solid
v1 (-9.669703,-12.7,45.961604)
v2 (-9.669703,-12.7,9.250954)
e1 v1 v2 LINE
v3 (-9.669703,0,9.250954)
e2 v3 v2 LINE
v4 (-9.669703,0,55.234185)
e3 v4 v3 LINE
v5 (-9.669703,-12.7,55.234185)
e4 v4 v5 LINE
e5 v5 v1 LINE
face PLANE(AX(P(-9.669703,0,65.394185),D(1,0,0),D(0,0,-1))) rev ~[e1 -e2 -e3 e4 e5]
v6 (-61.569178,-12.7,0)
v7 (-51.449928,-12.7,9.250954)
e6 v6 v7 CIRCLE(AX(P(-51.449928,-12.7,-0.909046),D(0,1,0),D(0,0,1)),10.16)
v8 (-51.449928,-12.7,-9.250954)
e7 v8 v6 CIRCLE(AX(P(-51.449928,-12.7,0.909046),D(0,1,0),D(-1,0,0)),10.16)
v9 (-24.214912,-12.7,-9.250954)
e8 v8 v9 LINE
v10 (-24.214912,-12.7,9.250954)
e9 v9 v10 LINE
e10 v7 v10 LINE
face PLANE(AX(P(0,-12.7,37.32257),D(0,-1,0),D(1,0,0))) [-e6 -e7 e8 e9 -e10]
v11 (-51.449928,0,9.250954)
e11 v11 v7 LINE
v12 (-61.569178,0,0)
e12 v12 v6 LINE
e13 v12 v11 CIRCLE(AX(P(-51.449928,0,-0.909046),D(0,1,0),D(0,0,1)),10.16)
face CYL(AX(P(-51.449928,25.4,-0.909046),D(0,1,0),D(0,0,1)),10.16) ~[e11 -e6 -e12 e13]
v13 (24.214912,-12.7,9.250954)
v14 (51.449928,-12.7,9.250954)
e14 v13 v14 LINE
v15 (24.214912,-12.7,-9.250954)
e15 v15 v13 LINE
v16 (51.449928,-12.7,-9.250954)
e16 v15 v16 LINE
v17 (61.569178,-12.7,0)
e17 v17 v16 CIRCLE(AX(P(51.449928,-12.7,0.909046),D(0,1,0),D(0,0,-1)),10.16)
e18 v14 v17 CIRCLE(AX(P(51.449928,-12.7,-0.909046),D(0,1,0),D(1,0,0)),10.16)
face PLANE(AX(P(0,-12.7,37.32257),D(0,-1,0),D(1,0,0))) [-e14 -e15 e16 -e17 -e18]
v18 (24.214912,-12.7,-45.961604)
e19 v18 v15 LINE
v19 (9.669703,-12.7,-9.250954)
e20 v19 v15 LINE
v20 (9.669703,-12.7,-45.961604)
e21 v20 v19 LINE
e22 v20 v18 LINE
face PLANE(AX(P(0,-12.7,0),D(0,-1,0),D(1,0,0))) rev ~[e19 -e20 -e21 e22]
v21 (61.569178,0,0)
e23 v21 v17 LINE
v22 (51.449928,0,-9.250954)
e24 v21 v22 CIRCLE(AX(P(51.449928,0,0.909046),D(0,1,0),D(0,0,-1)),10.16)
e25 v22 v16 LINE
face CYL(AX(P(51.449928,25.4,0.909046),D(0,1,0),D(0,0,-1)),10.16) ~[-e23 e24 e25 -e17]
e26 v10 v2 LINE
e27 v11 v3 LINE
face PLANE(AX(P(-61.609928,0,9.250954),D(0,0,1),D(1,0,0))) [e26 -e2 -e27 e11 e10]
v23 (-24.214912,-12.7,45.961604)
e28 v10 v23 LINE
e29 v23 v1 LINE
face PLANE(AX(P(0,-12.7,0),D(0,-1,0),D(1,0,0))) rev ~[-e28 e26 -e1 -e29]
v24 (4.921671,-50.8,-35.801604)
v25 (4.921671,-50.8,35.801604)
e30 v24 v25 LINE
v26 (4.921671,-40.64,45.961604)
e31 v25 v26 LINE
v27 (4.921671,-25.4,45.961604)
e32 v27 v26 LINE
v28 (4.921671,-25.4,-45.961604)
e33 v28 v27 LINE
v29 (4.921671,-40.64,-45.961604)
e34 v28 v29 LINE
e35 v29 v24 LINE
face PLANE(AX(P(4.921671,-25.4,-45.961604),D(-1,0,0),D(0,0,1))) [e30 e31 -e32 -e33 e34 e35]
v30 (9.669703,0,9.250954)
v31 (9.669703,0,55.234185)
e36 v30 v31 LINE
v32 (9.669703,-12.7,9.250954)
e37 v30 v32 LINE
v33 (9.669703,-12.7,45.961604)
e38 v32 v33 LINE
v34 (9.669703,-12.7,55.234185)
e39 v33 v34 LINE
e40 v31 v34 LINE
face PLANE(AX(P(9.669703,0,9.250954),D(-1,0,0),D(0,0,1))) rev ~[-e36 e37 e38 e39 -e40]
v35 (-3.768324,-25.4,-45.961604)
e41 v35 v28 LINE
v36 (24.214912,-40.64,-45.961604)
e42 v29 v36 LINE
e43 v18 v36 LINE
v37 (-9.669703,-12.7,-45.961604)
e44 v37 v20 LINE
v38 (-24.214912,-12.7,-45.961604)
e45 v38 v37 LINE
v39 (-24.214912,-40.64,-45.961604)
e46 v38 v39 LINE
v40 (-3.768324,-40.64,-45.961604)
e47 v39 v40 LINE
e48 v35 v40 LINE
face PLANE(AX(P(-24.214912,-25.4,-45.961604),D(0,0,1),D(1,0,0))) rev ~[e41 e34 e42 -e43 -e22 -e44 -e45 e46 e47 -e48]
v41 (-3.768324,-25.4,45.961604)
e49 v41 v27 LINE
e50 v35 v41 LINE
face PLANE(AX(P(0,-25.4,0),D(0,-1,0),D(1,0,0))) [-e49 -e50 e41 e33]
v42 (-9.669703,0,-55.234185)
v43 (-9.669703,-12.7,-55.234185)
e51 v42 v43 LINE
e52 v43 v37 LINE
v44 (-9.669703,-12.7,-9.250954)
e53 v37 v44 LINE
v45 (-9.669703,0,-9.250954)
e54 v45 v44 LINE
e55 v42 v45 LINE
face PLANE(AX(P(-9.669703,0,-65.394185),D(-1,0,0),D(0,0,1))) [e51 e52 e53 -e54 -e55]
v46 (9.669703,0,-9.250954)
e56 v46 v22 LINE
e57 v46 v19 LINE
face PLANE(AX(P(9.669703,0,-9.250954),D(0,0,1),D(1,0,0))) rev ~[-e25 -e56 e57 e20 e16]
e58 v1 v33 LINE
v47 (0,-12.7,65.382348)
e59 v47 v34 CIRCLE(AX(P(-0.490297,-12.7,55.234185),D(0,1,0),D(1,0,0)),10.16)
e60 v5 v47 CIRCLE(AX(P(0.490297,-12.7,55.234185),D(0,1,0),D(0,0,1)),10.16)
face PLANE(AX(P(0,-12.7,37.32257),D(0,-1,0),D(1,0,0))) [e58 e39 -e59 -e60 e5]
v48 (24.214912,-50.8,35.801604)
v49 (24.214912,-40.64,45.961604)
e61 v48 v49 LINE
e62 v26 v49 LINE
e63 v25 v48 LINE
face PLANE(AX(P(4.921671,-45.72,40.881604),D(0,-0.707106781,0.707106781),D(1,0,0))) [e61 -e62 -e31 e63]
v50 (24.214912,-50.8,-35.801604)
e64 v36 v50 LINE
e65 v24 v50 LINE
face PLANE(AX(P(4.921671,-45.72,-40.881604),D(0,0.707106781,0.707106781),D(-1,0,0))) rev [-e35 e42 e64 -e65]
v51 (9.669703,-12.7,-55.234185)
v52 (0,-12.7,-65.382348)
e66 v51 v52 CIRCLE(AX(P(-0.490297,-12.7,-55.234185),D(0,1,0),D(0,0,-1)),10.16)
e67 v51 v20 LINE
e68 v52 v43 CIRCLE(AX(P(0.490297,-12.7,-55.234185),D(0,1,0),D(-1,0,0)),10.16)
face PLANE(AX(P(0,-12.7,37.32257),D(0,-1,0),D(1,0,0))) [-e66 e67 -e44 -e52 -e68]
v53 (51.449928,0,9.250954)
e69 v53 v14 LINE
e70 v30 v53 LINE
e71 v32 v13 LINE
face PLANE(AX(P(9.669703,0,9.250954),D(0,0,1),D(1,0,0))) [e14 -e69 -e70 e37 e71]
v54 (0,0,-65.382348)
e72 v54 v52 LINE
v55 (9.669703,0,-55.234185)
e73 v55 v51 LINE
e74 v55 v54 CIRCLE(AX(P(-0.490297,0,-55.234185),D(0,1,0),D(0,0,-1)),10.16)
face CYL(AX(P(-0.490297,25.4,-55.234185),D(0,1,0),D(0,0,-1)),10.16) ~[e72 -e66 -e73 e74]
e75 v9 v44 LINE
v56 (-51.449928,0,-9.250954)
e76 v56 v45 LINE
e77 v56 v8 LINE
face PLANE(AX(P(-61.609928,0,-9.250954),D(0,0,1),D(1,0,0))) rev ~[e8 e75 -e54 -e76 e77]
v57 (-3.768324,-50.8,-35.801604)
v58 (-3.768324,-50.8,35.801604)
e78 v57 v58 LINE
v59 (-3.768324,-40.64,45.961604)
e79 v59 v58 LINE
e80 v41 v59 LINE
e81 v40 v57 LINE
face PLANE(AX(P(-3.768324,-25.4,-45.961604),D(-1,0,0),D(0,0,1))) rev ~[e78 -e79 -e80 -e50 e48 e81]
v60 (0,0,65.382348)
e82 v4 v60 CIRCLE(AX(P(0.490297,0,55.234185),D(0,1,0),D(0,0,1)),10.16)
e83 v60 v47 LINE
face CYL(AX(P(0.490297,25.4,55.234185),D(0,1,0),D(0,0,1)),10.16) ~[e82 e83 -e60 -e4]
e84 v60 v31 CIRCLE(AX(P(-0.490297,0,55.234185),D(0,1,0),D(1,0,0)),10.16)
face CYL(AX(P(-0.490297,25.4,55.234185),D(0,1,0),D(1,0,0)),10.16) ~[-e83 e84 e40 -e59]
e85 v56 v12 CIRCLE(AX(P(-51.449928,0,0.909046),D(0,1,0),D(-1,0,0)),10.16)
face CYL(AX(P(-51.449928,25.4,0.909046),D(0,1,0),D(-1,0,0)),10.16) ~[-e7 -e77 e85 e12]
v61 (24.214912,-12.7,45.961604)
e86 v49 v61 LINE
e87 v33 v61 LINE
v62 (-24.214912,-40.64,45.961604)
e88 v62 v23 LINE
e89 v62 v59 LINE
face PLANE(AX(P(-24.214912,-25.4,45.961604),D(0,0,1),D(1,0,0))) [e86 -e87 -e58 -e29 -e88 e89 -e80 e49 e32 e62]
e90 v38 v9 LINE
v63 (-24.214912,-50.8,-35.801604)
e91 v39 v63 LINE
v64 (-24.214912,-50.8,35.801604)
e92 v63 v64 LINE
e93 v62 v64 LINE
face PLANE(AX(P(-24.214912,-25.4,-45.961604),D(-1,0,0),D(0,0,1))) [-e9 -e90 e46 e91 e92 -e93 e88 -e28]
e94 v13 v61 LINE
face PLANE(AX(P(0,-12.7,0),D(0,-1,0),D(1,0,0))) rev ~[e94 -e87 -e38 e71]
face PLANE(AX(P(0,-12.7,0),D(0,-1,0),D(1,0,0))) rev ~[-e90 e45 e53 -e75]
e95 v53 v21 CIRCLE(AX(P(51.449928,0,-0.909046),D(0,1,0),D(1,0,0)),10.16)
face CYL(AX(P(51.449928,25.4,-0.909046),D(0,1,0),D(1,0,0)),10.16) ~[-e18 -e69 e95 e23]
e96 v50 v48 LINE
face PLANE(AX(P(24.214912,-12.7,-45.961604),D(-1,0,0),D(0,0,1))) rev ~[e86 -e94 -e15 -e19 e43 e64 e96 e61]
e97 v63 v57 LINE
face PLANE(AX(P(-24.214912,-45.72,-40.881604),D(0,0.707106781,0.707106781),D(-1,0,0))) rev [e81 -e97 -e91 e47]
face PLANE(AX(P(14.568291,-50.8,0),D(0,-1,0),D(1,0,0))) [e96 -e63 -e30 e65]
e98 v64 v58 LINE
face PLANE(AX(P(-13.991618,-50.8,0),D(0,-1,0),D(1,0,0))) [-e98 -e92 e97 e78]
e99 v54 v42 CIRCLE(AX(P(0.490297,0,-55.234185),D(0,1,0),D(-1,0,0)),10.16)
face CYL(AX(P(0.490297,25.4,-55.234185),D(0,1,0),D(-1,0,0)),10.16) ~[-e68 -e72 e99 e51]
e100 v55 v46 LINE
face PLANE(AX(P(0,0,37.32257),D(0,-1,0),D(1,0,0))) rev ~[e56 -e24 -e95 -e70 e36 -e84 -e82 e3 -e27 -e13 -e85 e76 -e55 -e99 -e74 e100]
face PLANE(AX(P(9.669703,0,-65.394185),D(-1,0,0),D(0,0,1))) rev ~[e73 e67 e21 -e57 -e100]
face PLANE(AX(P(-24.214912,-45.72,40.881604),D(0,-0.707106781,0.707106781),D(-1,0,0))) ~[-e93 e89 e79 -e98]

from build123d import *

# Parameters (mm, degrees)
F0_W        = 19.3394050002
F0_H        = 56.1432316899
F0_W_2      = 51.9402250648
F0_H_2      = 18.5019075871
F1_DEPTH    = 12.7
F2_T1_DEPTH = 63.5
F3_W        = 48.4298244119
F3_H        = 91.9232070446
F4_DEPTH    = 12.7
F5_W        = 20.4465882853
F5_H        = 91.9232070446
F5_W_2      = 19.2932416685
F6_DEPTH    = 25.4
F7_SIZE     = 10.16


# Not quite as in the source:
# - a fillet or chamfer that OpenCascade refuses, or shapes differently, is made with other operations: its cross-section is extruded or revolved along the edge and cut away or added


with BuildPart() as f1:
    # F0 (on Front) → F1 (new body)
    with BuildSketch(Plane.XZ):
        with Locations((0, 37.3225696385)):
            Rectangle(F0_W, F0_H)
        with Locations((35.6398150325, 0)):
            Rectangle(F0_W_2, F0_H_2)
        Rectangle(F0_W, F0_H_2)
        with Locations((-35.6398150325, 0)):
            Rectangle(F0_W_2, F0_H_2)
        with Locations((0, -37.3225696385)):
            Rectangle(F0_W, F0_H)
    extrude(amount=F1_DEPTH)

    # F2: fillet of radius 10.16 on 8 edges, made by hand

    # F2_s2 → F2_t1 (cut)
    with BuildSketch(Plane.XZ.offset(-25.4)):
        with BuildLine():
            ThreePointArc((9.6697025001, 55.2341854835), (6.693907397, 62.4183903803), (-0.4902974999, 65.3941854835))
            Line((-0.4902974999, 65.3941854835), (9.6697025001, 65.3941854835))
            Line((9.6697025001, 65.3941854835), (9.6697025001, 55.2341854835))
        make_face()
        with BuildLine():
            ThreePointArc((0.4902974999, 65.3941854835), (-6.693907397, 62.4183903803), (-9.6697025001, 55.2341854835))
            Line((-9.6697025001, 55.2341854835), (-9.6697025001, 65.3941854835))
            Line((-9.6697025001, 65.3941854835), (0.4902974999, 65.3941854835))
        make_face()
        with BuildLine():
            ThreePointArc((61.6099275649, -0.9090462065), (58.6341324617, 6.2751586904), (51.4499275649, 9.2509537935))
            Line((51.4499275649, 9.2509537935), (61.6099275649, 9.2509537935))
            Line((61.6099275649, 9.2509537935), (61.6099275649, -0.9090462065))
        make_face()
        with BuildLine():
            ThreePointArc((51.4499275649, -9.2509537935), (58.6341324617, -6.2751586904), (61.6099275649, 0.9090462065))
            Line((61.6099275649, 0.9090462065), (61.6099275649, -9.2509537935))
            Line((61.6099275649, -9.2509537935), (51.4499275649, -9.2509537935))
        make_face()
        with BuildLine():
            ThreePointArc((-0.4902974999, -65.3941854835), (6.693907397, -62.4183903803), (9.6697025001, -55.2341854835))
            Line((9.6697025001, -55.2341854835), (9.6697025001, -65.3941854835))
            Line((9.6697025001, -65.3941854835), (-0.4902974999, -65.3941854835))
        make_face()
        with BuildLine():
            ThreePointArc((-51.4499275649, 9.2509537935), (-58.6341324617, 6.2751586904), (-61.6099275649, -0.9090462065))
            Line((-61.6099275649, -0.9090462065), (-61.6099275649, 9.2509537935))
            Line((-61.6099275649, 9.2509537935), (-51.4499275649, 9.2509537935))
        make_face()
        with BuildLine():
            ThreePointArc((-61.6099275649, 0.9090462065), (-58.6341324617, -6.2751586904), (-51.4499275649, -9.2509537935))
            Line((-51.4499275649, -9.2509537935), (-61.6099275649, -9.2509537935))
            Line((-61.6099275649, -9.2509537935), (-61.6099275649, 0.9090462065))
        make_face()
        with BuildLine():
            ThreePointArc((-9.6697025001, -55.2341854835), (-6.693907397, -62.4183903803), (0.4902974999, -65.3941854835))
            Line((0.4902974999, -65.3941854835), (-9.6697025001, -65.3941854835))
            Line((-9.6697025001, -65.3941854835), (-9.6697025001, -55.2341854835))
        make_face()
    extrude(amount=F2_T1_DEPTH, mode=Mode.SUBTRACT)

    # F3 (on face) → F4 (join)
    with BuildSketch(Plane.XZ.offset(12.7)):
        Rectangle(F3_W, F3_H)
    extrude(amount=F4_DEPTH)

    # F5 (on face) → F6 (join)
    with BuildSketch(Plane.XZ.offset(25.4)):
        with Locations((-13.9916180633, 0)):
            Rectangle(F5_W, F5_H)
        with Locations((14.5682913717, 0)):
            Rectangle(F5_W_2, F5_H)
    extrude(amount=F6_DEPTH)

    # F7
    f7_edges = [f1.edges().sort_by_distance(p)[0] for p in [
        (-13.991618, -50.8, 45.961604),
        (-13.991618, -50.8, -45.961604),
        (14.568291, -50.8, -45.961604),
        (14.568291, -50.8, 45.961604),
    ]]
    chamfer(f7_edges, length=F7_SIZE)


solid = f1.part
